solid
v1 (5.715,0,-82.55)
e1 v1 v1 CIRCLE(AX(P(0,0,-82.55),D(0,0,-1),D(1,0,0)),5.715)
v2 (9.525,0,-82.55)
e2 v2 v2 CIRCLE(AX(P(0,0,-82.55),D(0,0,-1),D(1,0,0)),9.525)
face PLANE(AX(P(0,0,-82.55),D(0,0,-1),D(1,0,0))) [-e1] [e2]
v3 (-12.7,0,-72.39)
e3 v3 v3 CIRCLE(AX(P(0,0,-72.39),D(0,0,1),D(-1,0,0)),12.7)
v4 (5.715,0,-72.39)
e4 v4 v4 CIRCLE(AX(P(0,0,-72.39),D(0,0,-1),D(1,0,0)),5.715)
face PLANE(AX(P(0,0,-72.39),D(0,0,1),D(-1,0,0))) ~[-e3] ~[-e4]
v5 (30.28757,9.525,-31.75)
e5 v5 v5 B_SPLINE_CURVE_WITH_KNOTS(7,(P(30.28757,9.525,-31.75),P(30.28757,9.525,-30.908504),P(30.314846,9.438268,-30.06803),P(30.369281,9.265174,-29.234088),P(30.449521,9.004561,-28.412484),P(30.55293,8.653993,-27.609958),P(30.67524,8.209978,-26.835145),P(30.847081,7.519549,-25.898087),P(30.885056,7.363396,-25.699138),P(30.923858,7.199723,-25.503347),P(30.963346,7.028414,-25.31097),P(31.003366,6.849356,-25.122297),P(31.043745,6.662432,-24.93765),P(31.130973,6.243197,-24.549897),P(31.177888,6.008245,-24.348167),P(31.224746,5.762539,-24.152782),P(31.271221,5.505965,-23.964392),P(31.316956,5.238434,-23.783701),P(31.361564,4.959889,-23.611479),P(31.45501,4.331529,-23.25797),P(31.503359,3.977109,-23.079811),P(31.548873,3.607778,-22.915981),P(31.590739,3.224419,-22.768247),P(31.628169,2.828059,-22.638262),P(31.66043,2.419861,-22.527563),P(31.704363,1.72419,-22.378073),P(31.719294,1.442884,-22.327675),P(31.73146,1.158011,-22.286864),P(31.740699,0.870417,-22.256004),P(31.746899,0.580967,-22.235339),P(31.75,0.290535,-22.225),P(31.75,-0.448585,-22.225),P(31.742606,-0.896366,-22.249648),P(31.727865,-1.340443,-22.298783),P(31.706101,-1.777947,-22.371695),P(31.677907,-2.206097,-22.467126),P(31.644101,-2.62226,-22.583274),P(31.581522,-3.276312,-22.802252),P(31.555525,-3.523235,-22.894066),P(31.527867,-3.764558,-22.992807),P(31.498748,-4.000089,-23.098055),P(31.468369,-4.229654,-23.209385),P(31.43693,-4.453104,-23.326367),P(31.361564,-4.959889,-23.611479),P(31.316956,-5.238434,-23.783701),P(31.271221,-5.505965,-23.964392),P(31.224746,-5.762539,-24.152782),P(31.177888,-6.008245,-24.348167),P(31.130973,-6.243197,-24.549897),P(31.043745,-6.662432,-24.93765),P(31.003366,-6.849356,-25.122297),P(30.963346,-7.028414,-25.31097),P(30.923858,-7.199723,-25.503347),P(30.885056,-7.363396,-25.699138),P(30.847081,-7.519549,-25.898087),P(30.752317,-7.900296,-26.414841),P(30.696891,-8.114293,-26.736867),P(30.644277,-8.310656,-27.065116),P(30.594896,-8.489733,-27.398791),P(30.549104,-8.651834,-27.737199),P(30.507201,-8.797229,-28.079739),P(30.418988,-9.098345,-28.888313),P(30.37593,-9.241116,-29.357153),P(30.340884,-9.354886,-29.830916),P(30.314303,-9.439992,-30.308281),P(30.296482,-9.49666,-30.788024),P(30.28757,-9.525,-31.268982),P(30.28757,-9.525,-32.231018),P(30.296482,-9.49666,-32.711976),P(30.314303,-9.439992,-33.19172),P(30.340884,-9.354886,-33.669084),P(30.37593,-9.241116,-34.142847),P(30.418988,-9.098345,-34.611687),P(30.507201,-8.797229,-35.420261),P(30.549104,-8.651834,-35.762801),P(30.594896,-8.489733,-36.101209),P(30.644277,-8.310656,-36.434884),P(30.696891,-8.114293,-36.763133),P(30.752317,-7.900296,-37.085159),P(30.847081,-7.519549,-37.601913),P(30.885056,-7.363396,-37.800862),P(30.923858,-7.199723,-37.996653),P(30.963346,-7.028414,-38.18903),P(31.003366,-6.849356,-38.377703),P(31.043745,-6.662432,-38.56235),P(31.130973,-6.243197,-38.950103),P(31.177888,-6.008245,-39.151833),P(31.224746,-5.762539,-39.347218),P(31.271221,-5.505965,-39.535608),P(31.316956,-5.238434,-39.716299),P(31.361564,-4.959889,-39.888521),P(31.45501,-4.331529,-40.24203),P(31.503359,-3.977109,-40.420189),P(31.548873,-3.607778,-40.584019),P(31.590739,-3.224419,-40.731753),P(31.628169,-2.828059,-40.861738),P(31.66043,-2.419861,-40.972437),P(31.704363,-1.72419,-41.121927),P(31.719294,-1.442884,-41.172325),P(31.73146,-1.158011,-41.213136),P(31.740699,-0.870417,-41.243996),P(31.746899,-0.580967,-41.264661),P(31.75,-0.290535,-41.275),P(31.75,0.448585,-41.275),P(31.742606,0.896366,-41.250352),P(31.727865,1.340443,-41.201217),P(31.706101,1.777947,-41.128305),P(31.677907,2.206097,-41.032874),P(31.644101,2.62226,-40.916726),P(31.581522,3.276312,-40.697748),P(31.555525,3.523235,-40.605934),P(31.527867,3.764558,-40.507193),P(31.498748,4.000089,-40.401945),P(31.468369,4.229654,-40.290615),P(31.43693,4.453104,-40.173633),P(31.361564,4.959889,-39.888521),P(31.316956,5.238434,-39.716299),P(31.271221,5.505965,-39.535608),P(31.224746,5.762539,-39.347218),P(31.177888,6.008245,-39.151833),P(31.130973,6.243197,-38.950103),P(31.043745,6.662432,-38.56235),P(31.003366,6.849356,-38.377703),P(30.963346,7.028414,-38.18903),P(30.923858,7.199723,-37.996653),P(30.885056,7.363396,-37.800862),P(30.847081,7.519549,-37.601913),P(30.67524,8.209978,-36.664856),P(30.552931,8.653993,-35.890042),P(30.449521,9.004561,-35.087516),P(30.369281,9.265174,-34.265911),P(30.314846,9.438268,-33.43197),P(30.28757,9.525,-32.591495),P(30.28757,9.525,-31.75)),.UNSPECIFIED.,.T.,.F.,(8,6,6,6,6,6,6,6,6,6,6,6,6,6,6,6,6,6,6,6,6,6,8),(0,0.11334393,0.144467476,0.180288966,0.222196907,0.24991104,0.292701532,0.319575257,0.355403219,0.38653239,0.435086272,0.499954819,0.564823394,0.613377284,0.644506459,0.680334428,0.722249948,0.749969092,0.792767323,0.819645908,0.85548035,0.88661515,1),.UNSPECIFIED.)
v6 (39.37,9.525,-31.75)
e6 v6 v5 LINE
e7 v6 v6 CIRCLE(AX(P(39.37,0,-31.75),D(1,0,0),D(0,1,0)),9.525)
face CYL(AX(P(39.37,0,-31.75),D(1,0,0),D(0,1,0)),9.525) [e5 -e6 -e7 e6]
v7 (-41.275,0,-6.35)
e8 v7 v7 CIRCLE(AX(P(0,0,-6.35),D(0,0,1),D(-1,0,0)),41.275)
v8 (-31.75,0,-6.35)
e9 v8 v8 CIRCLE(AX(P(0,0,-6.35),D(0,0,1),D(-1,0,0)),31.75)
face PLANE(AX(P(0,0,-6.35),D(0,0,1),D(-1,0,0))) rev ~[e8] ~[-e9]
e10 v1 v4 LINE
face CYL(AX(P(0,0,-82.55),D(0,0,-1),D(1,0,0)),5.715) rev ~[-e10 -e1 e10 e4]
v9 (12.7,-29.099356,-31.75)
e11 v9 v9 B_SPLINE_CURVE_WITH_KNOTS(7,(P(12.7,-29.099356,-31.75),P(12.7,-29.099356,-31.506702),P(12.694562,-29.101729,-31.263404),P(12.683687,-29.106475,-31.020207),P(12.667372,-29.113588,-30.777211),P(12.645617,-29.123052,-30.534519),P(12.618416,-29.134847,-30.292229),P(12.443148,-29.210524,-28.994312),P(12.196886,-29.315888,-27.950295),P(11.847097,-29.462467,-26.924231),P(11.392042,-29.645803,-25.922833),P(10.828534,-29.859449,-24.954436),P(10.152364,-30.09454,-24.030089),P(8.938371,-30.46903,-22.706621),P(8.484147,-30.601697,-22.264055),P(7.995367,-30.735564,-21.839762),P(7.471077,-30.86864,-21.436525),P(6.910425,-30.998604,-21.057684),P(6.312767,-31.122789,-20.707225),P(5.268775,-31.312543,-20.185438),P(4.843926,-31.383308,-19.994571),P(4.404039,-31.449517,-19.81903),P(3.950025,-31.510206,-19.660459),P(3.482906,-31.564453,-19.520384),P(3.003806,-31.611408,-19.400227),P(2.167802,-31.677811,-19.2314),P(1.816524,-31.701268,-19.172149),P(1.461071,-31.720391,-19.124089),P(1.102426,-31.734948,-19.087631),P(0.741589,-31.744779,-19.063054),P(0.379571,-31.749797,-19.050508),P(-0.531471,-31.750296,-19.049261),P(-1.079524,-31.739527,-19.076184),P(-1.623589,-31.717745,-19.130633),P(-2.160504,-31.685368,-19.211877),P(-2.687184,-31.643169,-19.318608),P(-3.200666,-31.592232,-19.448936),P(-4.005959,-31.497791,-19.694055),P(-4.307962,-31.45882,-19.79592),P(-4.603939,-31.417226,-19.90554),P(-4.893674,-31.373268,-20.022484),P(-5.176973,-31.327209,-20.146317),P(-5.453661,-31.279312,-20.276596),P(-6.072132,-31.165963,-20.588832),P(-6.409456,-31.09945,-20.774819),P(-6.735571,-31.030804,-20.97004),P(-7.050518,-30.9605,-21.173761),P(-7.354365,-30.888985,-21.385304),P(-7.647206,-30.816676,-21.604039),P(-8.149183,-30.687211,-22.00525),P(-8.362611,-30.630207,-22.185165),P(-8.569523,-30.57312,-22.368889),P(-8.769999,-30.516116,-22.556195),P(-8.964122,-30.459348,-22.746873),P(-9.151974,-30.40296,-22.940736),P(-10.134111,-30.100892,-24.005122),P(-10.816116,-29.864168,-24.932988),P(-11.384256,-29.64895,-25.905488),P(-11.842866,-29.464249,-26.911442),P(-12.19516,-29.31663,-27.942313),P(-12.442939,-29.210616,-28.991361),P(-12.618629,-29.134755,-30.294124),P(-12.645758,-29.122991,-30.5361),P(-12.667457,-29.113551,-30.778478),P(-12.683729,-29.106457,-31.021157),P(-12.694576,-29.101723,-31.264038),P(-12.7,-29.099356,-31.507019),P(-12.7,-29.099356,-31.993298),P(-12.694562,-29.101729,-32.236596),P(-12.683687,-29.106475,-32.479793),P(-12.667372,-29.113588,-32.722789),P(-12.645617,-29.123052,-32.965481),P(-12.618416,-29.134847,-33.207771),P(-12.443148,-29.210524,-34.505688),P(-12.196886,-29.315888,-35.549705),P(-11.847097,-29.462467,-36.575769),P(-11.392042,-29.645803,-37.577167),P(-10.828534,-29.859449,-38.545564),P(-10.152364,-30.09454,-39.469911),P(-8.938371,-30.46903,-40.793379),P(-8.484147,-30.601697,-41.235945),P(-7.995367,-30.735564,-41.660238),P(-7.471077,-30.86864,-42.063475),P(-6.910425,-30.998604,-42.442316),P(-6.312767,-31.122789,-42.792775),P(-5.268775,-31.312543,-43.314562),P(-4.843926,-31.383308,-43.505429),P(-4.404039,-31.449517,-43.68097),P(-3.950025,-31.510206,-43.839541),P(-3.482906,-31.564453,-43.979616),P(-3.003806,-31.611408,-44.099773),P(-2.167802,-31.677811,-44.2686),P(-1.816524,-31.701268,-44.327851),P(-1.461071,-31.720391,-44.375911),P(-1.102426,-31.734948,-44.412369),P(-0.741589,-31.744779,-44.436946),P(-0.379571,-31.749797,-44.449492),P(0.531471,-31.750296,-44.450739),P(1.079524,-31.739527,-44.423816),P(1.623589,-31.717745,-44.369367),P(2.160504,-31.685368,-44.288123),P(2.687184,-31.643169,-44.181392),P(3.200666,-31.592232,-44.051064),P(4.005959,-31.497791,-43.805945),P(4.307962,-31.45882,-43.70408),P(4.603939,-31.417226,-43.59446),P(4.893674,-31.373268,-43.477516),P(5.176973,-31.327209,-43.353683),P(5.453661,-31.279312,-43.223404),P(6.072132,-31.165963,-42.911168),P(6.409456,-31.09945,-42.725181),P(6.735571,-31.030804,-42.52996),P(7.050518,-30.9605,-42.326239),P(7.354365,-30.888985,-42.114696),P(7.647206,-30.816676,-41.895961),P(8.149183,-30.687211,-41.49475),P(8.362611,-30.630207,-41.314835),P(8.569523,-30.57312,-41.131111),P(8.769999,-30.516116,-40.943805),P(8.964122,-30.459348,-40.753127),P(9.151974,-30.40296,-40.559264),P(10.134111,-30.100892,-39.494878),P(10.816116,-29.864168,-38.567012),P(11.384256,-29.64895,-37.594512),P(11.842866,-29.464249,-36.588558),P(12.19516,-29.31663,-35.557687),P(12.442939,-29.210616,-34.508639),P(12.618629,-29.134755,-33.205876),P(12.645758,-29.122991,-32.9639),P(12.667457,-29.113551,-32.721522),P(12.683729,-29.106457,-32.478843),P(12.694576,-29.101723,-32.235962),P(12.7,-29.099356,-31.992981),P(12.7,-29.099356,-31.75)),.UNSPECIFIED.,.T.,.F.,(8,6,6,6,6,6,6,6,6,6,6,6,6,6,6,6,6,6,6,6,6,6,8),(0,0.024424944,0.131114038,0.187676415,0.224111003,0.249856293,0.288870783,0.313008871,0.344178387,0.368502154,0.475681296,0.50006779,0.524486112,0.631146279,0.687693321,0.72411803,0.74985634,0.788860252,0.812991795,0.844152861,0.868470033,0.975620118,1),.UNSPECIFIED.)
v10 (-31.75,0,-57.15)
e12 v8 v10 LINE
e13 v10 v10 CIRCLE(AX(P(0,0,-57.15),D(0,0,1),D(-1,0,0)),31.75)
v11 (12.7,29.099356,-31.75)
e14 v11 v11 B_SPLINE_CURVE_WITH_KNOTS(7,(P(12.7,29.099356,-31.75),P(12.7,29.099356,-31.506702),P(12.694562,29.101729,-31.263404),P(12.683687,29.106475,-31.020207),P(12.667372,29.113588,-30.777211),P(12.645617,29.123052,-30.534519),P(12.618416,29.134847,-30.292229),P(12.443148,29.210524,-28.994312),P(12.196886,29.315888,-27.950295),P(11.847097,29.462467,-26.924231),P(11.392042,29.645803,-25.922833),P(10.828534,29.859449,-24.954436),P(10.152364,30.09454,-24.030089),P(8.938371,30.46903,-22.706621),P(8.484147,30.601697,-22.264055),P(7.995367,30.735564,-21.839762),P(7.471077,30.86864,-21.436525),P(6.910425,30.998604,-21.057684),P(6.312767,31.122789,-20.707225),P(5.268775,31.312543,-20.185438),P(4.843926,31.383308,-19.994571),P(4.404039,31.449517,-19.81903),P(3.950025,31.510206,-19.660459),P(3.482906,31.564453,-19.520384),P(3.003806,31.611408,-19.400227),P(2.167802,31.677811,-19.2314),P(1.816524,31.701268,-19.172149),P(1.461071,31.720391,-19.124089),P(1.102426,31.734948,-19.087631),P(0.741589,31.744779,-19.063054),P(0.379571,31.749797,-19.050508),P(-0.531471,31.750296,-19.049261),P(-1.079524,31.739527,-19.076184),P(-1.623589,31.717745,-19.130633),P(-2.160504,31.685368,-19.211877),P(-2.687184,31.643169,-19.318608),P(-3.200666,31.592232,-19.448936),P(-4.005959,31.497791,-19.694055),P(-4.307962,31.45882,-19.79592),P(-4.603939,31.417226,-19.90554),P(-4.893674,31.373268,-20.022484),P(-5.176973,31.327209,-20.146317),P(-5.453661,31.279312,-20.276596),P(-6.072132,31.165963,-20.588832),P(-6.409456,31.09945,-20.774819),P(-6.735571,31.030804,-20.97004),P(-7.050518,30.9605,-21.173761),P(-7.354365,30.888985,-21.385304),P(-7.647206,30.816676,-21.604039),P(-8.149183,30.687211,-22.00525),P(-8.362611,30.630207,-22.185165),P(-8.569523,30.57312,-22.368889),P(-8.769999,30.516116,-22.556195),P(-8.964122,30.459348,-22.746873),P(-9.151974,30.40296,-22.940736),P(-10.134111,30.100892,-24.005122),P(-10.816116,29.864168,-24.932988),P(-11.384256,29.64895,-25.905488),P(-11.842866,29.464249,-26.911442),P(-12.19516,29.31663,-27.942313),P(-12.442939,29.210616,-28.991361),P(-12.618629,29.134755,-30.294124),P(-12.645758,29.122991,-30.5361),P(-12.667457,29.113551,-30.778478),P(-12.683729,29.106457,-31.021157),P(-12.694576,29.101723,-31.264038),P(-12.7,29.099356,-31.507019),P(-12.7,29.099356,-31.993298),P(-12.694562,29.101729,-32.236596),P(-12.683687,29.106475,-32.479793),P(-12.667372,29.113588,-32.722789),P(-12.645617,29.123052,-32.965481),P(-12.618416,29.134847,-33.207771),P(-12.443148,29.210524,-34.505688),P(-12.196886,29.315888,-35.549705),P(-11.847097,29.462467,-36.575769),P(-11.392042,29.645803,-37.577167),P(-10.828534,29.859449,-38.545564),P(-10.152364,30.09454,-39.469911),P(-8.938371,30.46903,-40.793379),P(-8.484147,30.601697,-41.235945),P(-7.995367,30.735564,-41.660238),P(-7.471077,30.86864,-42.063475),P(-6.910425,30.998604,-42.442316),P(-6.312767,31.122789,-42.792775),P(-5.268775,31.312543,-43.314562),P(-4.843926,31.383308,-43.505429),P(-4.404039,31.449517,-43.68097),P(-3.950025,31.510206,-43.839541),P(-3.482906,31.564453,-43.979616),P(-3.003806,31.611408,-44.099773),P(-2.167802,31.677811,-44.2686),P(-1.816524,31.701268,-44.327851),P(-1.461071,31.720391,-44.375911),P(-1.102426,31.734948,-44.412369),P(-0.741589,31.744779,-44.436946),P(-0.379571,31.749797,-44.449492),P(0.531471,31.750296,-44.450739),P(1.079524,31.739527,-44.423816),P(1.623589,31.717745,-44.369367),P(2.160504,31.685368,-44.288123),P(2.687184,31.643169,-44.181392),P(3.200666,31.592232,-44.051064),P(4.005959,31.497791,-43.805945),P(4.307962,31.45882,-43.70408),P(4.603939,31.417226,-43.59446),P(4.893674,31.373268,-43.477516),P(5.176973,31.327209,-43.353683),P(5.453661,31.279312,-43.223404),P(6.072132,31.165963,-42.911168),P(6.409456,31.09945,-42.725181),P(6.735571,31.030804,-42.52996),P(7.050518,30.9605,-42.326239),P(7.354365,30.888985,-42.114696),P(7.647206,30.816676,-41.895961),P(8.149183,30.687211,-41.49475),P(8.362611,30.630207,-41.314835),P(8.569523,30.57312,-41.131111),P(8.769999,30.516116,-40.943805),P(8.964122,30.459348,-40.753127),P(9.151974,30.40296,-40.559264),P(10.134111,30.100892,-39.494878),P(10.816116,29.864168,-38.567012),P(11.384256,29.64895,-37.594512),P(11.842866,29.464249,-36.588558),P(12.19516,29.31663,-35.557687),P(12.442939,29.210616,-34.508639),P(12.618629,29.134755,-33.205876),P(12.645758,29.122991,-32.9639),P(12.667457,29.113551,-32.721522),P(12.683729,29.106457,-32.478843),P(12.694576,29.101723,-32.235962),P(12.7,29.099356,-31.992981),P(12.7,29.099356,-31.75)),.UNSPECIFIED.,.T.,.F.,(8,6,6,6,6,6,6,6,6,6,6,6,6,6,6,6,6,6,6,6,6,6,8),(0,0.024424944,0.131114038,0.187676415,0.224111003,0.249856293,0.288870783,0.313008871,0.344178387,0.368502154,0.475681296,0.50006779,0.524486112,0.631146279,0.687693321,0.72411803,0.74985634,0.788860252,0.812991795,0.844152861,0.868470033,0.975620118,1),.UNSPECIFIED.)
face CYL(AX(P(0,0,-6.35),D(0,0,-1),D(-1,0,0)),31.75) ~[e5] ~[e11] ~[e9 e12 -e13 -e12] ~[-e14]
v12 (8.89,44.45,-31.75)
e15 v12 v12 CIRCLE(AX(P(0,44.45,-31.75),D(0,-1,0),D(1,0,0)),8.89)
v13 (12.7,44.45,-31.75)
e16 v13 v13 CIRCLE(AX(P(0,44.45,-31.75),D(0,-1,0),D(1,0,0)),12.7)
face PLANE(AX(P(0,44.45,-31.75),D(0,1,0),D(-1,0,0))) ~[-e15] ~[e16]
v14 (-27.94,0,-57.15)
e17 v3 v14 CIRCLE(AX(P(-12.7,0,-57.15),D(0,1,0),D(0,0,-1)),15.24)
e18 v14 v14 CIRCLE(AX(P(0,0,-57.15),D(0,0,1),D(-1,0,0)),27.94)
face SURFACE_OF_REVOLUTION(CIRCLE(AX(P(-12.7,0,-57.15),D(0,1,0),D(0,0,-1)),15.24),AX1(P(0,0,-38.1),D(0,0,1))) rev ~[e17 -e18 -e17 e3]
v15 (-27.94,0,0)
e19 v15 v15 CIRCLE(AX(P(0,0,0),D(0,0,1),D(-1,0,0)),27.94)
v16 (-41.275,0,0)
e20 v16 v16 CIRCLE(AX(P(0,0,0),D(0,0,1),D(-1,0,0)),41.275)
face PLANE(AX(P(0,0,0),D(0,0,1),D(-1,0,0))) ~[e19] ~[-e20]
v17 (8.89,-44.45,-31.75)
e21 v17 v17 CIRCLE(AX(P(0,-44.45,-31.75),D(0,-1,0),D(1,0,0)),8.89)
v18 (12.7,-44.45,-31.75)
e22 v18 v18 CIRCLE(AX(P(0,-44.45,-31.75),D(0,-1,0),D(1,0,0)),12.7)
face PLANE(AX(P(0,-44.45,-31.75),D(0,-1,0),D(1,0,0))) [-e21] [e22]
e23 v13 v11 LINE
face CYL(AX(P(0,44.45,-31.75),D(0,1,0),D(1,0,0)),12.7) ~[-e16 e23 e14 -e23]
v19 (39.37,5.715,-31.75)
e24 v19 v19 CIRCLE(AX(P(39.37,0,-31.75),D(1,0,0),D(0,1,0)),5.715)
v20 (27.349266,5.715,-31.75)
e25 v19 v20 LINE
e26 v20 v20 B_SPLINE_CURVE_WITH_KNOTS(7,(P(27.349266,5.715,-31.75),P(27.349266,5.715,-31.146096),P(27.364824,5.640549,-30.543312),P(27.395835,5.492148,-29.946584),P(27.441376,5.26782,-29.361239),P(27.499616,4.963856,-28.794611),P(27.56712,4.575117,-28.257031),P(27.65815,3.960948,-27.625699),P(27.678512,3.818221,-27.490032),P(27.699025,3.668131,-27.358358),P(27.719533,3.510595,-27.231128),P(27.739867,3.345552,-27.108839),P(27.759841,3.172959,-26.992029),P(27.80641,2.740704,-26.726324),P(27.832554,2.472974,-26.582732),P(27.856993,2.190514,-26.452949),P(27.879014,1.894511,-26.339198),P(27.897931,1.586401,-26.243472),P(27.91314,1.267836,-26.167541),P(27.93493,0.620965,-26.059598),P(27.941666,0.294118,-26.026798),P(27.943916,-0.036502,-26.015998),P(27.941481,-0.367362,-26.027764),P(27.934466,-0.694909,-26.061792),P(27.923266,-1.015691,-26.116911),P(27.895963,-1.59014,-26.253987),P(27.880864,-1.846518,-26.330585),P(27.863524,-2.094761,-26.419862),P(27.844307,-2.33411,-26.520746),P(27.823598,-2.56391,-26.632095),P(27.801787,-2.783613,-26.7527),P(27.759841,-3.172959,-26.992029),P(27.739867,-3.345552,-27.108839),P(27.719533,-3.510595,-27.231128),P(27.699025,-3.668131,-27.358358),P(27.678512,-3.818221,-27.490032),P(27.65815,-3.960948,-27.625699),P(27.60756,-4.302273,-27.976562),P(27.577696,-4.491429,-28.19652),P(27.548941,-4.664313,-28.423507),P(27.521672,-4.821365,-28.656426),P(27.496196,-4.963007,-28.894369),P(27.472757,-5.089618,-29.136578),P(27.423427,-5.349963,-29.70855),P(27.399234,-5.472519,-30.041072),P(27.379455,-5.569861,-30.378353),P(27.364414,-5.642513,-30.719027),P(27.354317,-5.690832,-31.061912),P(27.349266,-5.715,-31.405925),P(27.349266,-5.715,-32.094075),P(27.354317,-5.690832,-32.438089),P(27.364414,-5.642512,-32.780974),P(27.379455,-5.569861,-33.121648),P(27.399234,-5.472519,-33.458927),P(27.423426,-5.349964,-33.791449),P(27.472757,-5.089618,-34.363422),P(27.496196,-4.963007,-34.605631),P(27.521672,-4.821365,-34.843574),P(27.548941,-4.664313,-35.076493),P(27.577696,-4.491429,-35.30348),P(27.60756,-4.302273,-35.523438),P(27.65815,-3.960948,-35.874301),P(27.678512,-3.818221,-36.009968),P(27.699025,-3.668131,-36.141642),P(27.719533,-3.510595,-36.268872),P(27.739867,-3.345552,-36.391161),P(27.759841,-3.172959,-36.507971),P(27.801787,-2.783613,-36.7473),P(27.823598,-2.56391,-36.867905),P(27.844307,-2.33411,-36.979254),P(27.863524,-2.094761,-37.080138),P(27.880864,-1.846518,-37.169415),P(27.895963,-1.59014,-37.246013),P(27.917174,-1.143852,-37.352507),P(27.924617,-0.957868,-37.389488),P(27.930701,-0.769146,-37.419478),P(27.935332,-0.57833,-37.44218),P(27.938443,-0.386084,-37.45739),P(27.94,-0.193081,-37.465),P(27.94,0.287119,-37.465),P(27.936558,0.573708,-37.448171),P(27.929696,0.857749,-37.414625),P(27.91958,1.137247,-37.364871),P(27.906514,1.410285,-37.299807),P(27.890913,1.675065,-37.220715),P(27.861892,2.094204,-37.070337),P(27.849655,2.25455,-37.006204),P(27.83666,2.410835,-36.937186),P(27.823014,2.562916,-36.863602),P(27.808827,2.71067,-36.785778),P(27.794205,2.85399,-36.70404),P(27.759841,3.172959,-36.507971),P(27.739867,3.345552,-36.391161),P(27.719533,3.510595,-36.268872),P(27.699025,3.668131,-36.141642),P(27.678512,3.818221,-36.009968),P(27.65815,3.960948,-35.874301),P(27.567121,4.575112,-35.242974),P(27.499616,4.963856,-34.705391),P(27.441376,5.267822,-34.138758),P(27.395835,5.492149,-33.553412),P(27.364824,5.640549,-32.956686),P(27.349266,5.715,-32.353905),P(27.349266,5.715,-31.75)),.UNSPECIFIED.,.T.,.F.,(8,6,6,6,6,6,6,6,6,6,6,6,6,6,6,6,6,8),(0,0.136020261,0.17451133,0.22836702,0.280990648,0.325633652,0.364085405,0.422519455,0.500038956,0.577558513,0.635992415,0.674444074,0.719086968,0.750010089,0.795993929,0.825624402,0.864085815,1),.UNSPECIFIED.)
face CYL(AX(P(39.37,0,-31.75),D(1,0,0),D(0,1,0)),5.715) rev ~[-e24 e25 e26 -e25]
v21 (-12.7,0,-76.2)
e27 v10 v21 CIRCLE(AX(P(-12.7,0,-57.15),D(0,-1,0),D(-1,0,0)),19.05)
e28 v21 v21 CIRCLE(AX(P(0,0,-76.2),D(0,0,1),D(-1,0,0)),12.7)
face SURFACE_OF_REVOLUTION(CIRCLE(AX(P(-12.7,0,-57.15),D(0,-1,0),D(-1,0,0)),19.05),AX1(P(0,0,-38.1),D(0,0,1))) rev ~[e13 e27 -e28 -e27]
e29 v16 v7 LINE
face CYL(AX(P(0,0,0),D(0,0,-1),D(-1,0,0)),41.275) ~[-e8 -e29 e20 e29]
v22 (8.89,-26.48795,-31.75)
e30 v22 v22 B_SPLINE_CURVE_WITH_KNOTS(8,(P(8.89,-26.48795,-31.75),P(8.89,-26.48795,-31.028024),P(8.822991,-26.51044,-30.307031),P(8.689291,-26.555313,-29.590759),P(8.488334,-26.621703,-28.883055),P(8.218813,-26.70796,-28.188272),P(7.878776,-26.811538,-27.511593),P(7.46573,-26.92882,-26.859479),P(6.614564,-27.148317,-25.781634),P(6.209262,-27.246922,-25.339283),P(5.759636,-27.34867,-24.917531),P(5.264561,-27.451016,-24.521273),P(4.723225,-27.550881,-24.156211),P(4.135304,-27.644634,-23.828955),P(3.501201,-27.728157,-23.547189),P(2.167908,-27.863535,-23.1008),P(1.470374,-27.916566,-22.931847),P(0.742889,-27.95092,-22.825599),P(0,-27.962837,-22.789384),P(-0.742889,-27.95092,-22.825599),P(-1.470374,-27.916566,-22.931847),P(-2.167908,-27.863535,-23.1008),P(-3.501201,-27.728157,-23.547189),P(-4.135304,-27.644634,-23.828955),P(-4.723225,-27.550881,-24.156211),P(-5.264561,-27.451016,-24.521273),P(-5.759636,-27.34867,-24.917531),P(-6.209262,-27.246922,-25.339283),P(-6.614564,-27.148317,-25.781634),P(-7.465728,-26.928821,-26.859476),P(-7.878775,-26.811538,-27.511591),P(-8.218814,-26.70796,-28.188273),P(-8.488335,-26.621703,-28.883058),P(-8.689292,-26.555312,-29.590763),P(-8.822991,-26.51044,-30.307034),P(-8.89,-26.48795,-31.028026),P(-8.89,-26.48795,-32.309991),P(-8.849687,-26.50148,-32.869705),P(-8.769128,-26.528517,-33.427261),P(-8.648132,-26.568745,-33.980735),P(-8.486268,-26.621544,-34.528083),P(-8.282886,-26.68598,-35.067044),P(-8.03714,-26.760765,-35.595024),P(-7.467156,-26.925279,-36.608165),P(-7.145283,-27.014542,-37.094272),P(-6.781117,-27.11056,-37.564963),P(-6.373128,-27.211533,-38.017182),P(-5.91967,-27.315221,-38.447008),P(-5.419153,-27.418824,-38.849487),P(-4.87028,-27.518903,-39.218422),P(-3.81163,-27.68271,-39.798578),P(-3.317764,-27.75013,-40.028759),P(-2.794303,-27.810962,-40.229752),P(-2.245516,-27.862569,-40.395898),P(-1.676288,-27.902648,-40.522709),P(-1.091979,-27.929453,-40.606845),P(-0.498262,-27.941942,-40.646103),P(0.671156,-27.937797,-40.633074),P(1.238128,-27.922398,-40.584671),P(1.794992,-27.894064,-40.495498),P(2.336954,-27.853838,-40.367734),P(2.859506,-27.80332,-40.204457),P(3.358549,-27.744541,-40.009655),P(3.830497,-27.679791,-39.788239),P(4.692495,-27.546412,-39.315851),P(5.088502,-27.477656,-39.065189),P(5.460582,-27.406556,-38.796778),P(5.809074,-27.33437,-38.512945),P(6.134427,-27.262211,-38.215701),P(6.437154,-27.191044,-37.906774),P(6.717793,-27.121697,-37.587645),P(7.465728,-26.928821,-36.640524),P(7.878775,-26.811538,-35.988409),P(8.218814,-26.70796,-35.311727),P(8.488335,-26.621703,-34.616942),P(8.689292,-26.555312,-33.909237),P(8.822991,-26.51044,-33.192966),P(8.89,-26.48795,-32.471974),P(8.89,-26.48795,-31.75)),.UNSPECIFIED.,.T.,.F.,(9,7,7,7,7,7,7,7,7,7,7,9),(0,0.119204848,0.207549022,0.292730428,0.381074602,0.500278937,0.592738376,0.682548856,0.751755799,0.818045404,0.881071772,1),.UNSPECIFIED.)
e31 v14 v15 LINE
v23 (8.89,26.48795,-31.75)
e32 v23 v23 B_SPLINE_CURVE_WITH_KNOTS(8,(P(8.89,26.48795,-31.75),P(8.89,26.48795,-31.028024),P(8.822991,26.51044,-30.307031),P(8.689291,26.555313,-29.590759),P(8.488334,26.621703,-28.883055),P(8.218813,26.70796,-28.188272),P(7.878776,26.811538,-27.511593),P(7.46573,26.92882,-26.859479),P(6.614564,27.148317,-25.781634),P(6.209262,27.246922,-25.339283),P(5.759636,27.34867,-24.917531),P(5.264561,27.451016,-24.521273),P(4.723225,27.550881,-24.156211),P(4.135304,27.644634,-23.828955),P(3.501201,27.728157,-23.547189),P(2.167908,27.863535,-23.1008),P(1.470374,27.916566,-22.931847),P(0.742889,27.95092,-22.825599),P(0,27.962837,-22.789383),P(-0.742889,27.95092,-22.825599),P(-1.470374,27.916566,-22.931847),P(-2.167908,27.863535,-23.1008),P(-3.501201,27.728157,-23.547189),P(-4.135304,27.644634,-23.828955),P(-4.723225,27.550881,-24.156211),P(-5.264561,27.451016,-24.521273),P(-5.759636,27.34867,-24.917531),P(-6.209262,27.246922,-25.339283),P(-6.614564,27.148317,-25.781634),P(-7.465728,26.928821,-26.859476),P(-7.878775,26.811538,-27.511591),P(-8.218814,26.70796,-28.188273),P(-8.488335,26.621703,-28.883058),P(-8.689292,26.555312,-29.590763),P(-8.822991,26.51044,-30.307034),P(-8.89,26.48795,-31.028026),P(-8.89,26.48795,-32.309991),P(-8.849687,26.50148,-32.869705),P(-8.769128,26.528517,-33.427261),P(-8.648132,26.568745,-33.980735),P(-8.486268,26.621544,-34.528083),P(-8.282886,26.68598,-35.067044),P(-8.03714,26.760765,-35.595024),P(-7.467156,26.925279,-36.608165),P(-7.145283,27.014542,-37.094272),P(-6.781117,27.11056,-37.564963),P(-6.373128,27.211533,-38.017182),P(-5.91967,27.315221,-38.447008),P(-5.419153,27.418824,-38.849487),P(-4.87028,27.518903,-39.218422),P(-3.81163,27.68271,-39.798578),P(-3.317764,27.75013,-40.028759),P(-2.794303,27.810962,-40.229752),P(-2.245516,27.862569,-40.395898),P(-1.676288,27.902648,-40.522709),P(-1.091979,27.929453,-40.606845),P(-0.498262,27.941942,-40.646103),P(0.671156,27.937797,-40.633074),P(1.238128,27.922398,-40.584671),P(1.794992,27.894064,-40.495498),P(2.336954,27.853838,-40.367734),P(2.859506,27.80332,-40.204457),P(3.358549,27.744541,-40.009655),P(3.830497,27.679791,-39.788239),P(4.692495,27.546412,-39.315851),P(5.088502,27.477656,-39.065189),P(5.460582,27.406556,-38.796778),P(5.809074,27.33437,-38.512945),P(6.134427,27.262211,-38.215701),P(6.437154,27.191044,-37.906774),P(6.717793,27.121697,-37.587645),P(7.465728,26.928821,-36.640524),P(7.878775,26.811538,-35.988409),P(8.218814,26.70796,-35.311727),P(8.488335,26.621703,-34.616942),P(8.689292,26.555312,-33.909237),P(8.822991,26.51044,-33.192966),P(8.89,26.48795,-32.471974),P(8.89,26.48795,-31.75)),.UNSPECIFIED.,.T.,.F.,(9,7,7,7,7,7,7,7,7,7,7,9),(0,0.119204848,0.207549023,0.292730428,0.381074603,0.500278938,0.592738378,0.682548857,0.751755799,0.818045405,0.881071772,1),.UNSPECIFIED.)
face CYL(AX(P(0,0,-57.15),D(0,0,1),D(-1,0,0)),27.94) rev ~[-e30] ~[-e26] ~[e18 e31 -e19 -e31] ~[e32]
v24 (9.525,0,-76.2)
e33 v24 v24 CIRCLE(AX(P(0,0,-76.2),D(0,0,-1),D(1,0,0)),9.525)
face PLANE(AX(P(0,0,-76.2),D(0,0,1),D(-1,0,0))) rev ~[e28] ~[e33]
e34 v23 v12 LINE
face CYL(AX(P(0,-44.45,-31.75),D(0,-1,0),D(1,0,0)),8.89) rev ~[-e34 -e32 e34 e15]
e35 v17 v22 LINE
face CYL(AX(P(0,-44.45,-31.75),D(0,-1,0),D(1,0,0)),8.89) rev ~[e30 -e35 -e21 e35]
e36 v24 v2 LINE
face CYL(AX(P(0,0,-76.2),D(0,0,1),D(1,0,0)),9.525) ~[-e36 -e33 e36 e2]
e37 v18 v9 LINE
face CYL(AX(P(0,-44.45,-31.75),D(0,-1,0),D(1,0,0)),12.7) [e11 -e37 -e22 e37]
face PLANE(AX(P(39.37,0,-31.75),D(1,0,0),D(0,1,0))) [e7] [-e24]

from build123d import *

# Parameters (mm, degrees)
F3_R      = 9.525
F4_DEPTH  = 6.35
F6_R      = 12.7
F8_R      = 8.89
F9_DEPTH  = 101.6
F10_R     = 5.715
F11_DEPTH = 25.4
F13_R     = 9.525
F15_R     = 5.715
F16_DEPTH = 25.4


# Not quite as in the source:
# - a pattern or mirror of a feature is missing from the dataset's text; its kind, count and spacing are read off the source's solid


with BuildPart() as f1:
    # F0 (on Front) → F1 (revolve)
    with BuildSketch(Plane.XZ):
        with BuildLine():
            Line((-27.94, 0), (-41.275, 0))
            Line((-41.275, 0), (-41.275, -6.35))
            Line((-41.275, -6.35), (-31.75, -6.35))
            Line((-31.75, -6.35), (-31.75, -57.15))
            ThreePointArc((-31.75, -57.15), (-26.1703841816, -70.6203841816), (-12.7, -76.2))
            Line((-12.7, -76.2), (0, -76.2))
            Line((0, -76.2), (0, -72.39))
            Line((0, -72.39), (-12.7, -72.39))
            ThreePointArc((-12.7, -72.39), (-23.4763073453, -67.9263073453), (-27.94, -57.15))
            Line((-27.94, -57.15), (-27.94, 0))
        make_face()
    revolve(axis=Axis((0, 0, -38.1), (0, 0, 1)))



with BuildPart() as f2:
    # F0 (on Front) → F2 (revolve)
    with BuildSketch(Plane.XZ):
        with BuildLine():
            Line((-27.94, 0), (-41.275, 0))
            Line((-41.275, 0), (-41.275, -6.35))
            Line((-41.275, -6.35), (-31.75, -6.35))
            Line((-31.75, -6.35), (-31.75, -57.15))
            ThreePointArc((-31.75, -57.15), (-26.1703841816, -70.6203841816), (-12.7, -76.2))
            Line((-12.7, -76.2), (0, -76.2))
            Line((0, -76.2), (0, -72.39))
            Line((0, -72.39), (-12.7, -72.39))
            ThreePointArc((-12.7, -72.39), (-23.4763073453, -67.9263073453), (-27.94, -57.15))
            Line((-27.94, -57.15), (-27.94, 0))
        make_face()
    revolve(axis=Axis((0, 0, -38.1), (0, 0, 1)))


with BuildPart() as f1_1:
    add(f1.part)

    add(f2.part)  # F4 merges F2
    # F3 (on face) → F4 (join)
    with BuildSketch(Plane(origin=(0, 0, -76.2), x_dir=(1, 0, 0), z_dir=(0, 0, -1))):
        Circle(F3_R)
    extrude(amount=F4_DEPTH)

    # F6 (on offset) → F7 (join, up to the next surface of F1)
    with BuildSketch(Plane.XZ.offset(44.45)):
        with Locations((0, -31.75)):
            Circle(F6_R)
    f7 = extrude(until=Until.NEXT, dir=(0, 1, 0))

    # F7_copies: F7 across plane
    add(f7.mirror(Plane.ZX))

    # F8 (on face) → F9 (cut)
    with BuildSketch(Plane.XZ.offset(44.45)):
        with Locations((0, -31.75)):
            Circle(F8_R)
    extrude(amount=-F9_DEPTH, mode=Mode.SUBTRACT)

    # F10 (on face) → F11 (cut)
    with BuildSketch(Plane(origin=(0, 0, -82.55), x_dir=(1, 0, 0), z_dir=(0, 0, -1))):
        Circle(F10_R)
    extrude(amount=-F11_DEPTH, mode=Mode.SUBTRACT)

    # F13 (on offset) → F14 (join, up to the next surface of F1)
    with BuildSketch(Plane.YZ.offset(39.37)):
        with Locations((0, -31.75)):
            Circle(F13_R)
    extrude(until=Until.NEXT, dir=(-1, 0, 0))

    # F15 (on face) → F16 (cut)
    with BuildSketch(Plane.YZ.offset(39.37)):
        with Locations((0, -31.75)):
            Circle(F15_R)
    extrude(amount=-F16_DEPTH, mode=Mode.SUBTRACT)


solid = f1_1.part
